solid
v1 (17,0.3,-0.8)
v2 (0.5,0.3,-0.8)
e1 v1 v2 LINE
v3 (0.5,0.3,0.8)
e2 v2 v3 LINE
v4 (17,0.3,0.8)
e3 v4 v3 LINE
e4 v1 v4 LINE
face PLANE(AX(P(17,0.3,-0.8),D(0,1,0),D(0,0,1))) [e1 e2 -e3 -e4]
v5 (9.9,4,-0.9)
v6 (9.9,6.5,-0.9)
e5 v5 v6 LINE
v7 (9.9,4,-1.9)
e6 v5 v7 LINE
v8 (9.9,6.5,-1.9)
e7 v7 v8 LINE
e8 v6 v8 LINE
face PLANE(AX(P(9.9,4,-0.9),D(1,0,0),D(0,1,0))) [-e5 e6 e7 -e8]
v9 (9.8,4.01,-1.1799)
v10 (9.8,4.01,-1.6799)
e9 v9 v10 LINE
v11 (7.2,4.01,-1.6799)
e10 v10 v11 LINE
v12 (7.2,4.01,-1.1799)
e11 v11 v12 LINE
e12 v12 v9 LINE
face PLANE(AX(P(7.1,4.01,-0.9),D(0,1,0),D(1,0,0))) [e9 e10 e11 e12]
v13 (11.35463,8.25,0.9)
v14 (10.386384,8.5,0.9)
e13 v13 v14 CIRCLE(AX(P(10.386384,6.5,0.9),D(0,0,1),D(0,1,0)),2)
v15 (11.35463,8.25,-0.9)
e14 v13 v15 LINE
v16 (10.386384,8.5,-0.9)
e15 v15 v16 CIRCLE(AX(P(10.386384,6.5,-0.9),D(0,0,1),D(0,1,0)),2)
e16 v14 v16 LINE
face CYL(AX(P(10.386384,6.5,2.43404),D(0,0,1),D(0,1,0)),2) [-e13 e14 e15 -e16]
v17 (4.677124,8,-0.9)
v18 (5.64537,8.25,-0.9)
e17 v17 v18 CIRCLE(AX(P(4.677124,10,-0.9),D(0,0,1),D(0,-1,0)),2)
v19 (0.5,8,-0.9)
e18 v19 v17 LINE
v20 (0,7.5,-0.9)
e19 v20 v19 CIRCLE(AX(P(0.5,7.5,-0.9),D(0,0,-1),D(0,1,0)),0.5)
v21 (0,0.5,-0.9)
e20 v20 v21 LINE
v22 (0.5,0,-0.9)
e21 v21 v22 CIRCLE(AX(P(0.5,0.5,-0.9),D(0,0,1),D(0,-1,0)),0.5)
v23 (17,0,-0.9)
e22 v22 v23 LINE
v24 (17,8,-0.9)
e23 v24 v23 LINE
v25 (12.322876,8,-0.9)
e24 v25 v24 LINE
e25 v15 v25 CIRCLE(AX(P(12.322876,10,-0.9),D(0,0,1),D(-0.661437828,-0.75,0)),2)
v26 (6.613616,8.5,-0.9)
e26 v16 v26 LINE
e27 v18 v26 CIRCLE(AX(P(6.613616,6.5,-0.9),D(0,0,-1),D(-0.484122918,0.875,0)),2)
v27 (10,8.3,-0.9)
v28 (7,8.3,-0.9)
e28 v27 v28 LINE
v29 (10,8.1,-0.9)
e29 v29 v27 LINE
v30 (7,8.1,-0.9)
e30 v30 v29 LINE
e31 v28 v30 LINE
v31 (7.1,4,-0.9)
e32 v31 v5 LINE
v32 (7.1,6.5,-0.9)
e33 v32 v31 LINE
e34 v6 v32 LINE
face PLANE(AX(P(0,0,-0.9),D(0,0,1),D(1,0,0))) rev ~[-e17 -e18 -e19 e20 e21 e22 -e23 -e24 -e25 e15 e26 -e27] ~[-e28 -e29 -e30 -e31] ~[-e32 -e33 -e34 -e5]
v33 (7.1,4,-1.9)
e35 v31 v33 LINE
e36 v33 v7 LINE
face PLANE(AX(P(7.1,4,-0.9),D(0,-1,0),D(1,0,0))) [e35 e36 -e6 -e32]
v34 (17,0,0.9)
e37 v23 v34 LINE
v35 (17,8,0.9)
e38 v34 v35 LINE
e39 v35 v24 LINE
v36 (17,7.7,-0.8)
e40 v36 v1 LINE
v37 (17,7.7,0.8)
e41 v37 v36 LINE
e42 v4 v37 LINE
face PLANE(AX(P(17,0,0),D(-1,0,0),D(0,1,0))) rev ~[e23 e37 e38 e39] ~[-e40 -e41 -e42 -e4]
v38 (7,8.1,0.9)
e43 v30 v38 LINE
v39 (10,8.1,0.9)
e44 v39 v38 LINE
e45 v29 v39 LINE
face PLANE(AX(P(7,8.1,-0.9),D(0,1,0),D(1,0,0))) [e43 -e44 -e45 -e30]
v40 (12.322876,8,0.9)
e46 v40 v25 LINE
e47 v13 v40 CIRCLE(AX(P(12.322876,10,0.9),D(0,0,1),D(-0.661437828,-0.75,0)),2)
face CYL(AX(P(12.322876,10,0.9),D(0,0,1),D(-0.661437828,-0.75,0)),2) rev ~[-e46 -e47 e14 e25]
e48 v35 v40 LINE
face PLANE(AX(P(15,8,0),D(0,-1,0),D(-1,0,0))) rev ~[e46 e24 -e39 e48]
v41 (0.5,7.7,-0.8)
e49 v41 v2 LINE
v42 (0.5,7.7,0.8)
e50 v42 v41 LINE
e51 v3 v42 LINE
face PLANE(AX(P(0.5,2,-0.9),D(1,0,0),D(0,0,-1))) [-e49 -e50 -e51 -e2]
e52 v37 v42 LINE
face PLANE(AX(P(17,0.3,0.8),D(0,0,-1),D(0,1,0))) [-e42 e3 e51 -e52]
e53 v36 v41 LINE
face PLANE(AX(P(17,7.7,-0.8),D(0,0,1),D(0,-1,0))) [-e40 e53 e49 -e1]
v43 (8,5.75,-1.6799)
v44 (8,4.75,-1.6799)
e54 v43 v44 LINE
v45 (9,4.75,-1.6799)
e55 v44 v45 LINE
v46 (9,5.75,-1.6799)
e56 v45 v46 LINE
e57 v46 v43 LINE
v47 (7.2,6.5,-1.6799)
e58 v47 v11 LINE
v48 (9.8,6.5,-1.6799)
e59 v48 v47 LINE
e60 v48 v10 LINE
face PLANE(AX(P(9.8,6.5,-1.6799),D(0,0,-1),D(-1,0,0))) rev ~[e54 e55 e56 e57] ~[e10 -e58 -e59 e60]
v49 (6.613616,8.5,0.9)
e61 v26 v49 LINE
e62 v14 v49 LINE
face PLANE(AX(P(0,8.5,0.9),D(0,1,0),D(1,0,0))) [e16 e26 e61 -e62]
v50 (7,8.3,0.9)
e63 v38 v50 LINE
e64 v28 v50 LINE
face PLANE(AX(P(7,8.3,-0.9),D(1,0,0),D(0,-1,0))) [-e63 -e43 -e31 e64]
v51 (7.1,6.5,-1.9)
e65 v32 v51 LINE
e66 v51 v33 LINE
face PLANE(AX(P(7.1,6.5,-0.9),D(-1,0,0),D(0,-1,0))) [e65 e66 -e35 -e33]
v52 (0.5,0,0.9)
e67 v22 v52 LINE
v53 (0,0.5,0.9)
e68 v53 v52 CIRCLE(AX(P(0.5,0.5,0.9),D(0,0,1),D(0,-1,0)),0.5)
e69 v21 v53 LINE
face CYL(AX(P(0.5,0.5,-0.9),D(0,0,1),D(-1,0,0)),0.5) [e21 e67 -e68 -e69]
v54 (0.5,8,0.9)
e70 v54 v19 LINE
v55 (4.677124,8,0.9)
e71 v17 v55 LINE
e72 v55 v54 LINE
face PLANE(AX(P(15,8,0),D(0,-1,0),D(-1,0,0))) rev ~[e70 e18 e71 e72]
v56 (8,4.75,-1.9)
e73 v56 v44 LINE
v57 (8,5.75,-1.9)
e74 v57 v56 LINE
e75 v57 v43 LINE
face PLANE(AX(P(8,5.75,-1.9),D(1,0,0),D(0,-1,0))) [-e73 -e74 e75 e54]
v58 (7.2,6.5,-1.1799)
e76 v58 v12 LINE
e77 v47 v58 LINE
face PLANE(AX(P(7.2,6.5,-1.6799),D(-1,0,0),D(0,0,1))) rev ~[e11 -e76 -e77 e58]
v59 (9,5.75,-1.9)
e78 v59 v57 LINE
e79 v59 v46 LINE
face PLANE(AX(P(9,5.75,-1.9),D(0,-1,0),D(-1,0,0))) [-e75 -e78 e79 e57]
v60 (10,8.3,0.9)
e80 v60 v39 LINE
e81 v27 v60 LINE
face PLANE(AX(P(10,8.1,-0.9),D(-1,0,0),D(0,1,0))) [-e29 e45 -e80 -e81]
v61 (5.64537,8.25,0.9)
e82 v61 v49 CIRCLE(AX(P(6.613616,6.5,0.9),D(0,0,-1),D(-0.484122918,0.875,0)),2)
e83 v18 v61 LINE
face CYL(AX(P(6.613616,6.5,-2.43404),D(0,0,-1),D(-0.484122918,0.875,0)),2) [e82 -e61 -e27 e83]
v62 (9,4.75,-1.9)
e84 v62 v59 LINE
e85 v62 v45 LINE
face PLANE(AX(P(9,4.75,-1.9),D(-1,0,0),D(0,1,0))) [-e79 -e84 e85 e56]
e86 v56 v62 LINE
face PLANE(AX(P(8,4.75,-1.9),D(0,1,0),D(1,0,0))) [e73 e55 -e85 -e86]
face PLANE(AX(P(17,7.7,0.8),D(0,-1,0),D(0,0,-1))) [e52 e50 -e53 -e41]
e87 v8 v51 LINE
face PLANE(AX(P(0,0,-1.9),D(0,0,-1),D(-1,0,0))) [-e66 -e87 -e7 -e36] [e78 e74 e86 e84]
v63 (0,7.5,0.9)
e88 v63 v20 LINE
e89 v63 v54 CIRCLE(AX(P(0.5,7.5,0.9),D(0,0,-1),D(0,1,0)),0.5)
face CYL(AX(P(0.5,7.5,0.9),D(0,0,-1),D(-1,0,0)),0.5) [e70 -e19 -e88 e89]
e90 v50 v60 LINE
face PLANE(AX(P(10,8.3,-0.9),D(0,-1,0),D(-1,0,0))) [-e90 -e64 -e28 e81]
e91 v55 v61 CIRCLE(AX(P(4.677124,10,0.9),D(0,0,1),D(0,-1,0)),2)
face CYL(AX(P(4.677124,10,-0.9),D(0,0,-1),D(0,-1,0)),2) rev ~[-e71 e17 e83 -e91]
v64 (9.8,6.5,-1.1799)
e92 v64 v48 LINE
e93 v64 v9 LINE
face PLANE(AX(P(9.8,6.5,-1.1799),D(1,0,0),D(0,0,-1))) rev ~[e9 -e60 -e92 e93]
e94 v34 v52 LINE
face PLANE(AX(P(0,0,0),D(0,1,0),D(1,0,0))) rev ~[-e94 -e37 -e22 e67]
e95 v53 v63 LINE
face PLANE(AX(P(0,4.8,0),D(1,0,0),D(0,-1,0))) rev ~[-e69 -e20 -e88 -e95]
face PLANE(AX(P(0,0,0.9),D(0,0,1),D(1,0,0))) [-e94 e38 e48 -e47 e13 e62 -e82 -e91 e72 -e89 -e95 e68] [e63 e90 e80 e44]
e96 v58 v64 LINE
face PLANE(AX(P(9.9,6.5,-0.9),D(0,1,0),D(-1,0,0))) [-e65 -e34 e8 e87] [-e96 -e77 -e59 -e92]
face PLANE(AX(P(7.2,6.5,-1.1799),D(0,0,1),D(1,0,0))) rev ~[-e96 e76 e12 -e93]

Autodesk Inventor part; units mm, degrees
ref_plane "YZ Plane" through (0, 0, 0) normal (1, 0, 0) x (0, 1, 0)
ref_plane "XZ Plane" through (0, 0, 0) normal (0, 1, 0) x (-1, 0, 0)
sketch "스케치1" plane through (0, 0, 0) normal (0, 0, 1) x (1, 0, 0)
  line L0 (0, 0) -> (17, 0)
  line L1 (17, 0) -> (17, 8)
  line L2 (17, 8) -> (0, 8)
  line L3 (0, 8) -> (0, 0)
  line L4 (0, 4.8) -> (17, 4.8)
  line L5 (15, 8) -> (15, 0)
  dimension "d0" = 17
  dimension "d1" = 8
  dimension "d3" = 4.8
  dimension "d4" = 15
extrude "돌출1" add sketch "스케치1" along normal mid plane 1.8
sketch "스케치3" plane through (0, 0, 0.9) normal (-1, 0, 0) x (0, 0, 1)
  line L0 (-1.8, 0) -> (0, 0) projected
  line L1 (-1.8, 0) -> (-1.8, 8) projected
  line L2 (-1.7, 7.7) -> (-0.1, 7.7)
  line L3 (-0.1, 7.7) -> (-0.1, 0.3)
  line L4 (-0.1, 0.3) -> (-1.7, 0.3)
  line L5 (-1.7, 0.3) -> (-1.7, 7.7)
  line L6 (-1.8, 8) -> (0, 8) projected
  line L7 (0, 8) -> (0, 0) projected
  point P0 (-0.9, 0)
  dimension "d11" = 0.3
  dimension "d12" = 0.3
  dimension "d13" = 0.1
  dimension "d14" = 0.1
sketch "스케치5" plane through (0, 0, -0.9) normal (0, 0, -1) x (-1, 0, 0)
  line L0 (0, 0) -> (0, 8) projected
  line L1 (-17, 0) -> (0, 0) projected
  line L2 (-9.9, 6.5) -> (-7.1, 6.5)
  line L3 (-7.1, 6.5) -> (-7.1, 4)
  line L4 (-7.1, 4) -> (-9.9, 4)
  line L5 (-9.9, 4) -> (-9.9, 6.5)
  line L6 (-17, 8) -> (-17, 0) projected
  line L7 (0, 8) -> (-17, 8) projected
  dimension "d21" = 2.8
  dimension "d22" = 2.5
  dimension "d24" = 1.5
  dimension "d25" = 7.1
extrude "돌출3" add sketch "스케치5" along normal blind 1 contours L2 L3 L4 L5
sketch "스케치6" plane through (0, 0, -1.9) normal (0, 0, -1) x (-1, 0, 0)
  line L0 (-9, 5.75) -> (-8, 5.75)
  line L1 (-8, 5.75) -> (-8, 4.75)
  line L2 (-8, 4.75) -> (-9, 4.75)
  line L3 (-9, 4.75) -> (-9, 5.75)
  line L4 (-9, 5.75) -> (-8, 4.75) construction
  line L5 (-8, 5.75) -> (-9, 4.75) construction
  line L6 (0, 8) -> (-17, 8) projected
  line L7 (0, 0) -> (0, 8) projected
  point P0 (-8.5, 5.25)
  dimension "d28" = 1
  dimension "d29" = 1
  dimension "d30" = 2.75
  dimension "d31" = 8.5
sketch "스케치7" plane through (7.1, 6.5, -0.9) normal (0, 1, 0) x (1, 0, 0)
  line L0 (0, 0) -> (0, 1) projected
  line L1 (0.1, 0.2799) -> (2.7, 0.2799)
  line L2 (2.7, 0.2799) -> (2.7, 0.7799)
  line L3 (2.7, 0.7799) -> (0.1, 0.7799)
  line L4 (0.1, 0.7799) -> (0.1, 0.2799)
  point P0 (-7.1, -0.9)
  point P1 (2.8, 0)
  dimension "d32" = 0.5
  dimension "d33" = 2.6
  dimension "d34" = 0.1
extrude "돌출4" cut sketch "스케치7" against normal blind 2.49
extrude "돌출5" cut sketch "스케치6" against normal blind 0.5
sketch "스케치8" plane through (0, 8, 0.9) normal (0, 1, 0) x (1, 0, 0)
  line L0 (17, 1.8) -> (0, 1.8) projected
  line L1 (17, 0) -> (0, 0) projected
  line L2 (11, 1.8) -> (6, 1.8)
  line L3 (6, 1.8) -> (6, 0)
  line L4 (6, 0) -> (11, 0)
  line L5 (11, 0) -> (11, 1.8)
  line L6 (17, 0) -> (17, 1.8) projected
  point P0 (0, 0.9)
  point P1 (11, 0)
  dimension "d39" = 5
  dimension "d40" = 6
extrude "돌출6" add sketch "스케치8" along normal blind 0.5 contours L5 L1 L3 L0
sketch "스케치9" plane through (0, 0, -0.9) normal (0, 0, -1) x (-1, 0, 0)
  line L0 (-10, 8.3) -> (-7, 8.3)
  line L1 (-7, 8.3) -> (-7, 8.1)
  line L2 (-7, 8.1) -> (-10, 8.1)
  line L3 (-10, 8.1) -> (-10, 8.3)
  line L4 (-11, 8) -> (-11, 8.5) projected
  line L5 (-11, 8.5) -> (-6, 8.5) projected
  point P0 (0, 0)
  dimension "d43" = 0.2
  dimension "d44" = 3
  dimension "d45" = 1
  dimension "d46" = 0.2
extrude "돌출7" cut sketch "스케치9" against normal blind 6
fillet "모깎기1" radius 2 4 edges at (11, 8.5, 0) (6, 8.5, 0) (11, 8, 0) (6, 8, 0)
fillet "모깎기3" radius 0.5 2 edges at (0, 0, 0) (0, 8, 0)
ref_plane "작업 평면1" through (17, 2, -0.9) normal (1, 0, 0) x (0, 0, -1)
sketch "스케치10" plane through (17, 2, -0.9) normal (1, 0, 0) x (0, 0, -1)
  line L0 (-1.7, 5.7) -> (-0.1, 5.7)
  line L1 (-0.1, 5.7) -> (-0.1, -1.7)
  line L2 (-0.1, -1.7) -> (-1.7, -1.7)
  line L3 (-1.7, -1.7) -> (-1.7, 5.7)
  line L4 (-1.8, 4) -> (-1.8, 6) projected
  line L5 (0, 4) -> (0, 0) projected
  line L6 (0, 6) -> (-1.8, 6) projected
  line L7 (-1.8, -2) -> (0, -2) projected
  point P0 (-0.9, -2)
  dimension "d52" = 0.1
  dimension "d53" = 0.1
  dimension "d54" = 0.3
  dimension "d55" = 0.3
extrude "돌출8" cut sketch "스케치10" against normal blind 16.5
properties part number "bobecase"
